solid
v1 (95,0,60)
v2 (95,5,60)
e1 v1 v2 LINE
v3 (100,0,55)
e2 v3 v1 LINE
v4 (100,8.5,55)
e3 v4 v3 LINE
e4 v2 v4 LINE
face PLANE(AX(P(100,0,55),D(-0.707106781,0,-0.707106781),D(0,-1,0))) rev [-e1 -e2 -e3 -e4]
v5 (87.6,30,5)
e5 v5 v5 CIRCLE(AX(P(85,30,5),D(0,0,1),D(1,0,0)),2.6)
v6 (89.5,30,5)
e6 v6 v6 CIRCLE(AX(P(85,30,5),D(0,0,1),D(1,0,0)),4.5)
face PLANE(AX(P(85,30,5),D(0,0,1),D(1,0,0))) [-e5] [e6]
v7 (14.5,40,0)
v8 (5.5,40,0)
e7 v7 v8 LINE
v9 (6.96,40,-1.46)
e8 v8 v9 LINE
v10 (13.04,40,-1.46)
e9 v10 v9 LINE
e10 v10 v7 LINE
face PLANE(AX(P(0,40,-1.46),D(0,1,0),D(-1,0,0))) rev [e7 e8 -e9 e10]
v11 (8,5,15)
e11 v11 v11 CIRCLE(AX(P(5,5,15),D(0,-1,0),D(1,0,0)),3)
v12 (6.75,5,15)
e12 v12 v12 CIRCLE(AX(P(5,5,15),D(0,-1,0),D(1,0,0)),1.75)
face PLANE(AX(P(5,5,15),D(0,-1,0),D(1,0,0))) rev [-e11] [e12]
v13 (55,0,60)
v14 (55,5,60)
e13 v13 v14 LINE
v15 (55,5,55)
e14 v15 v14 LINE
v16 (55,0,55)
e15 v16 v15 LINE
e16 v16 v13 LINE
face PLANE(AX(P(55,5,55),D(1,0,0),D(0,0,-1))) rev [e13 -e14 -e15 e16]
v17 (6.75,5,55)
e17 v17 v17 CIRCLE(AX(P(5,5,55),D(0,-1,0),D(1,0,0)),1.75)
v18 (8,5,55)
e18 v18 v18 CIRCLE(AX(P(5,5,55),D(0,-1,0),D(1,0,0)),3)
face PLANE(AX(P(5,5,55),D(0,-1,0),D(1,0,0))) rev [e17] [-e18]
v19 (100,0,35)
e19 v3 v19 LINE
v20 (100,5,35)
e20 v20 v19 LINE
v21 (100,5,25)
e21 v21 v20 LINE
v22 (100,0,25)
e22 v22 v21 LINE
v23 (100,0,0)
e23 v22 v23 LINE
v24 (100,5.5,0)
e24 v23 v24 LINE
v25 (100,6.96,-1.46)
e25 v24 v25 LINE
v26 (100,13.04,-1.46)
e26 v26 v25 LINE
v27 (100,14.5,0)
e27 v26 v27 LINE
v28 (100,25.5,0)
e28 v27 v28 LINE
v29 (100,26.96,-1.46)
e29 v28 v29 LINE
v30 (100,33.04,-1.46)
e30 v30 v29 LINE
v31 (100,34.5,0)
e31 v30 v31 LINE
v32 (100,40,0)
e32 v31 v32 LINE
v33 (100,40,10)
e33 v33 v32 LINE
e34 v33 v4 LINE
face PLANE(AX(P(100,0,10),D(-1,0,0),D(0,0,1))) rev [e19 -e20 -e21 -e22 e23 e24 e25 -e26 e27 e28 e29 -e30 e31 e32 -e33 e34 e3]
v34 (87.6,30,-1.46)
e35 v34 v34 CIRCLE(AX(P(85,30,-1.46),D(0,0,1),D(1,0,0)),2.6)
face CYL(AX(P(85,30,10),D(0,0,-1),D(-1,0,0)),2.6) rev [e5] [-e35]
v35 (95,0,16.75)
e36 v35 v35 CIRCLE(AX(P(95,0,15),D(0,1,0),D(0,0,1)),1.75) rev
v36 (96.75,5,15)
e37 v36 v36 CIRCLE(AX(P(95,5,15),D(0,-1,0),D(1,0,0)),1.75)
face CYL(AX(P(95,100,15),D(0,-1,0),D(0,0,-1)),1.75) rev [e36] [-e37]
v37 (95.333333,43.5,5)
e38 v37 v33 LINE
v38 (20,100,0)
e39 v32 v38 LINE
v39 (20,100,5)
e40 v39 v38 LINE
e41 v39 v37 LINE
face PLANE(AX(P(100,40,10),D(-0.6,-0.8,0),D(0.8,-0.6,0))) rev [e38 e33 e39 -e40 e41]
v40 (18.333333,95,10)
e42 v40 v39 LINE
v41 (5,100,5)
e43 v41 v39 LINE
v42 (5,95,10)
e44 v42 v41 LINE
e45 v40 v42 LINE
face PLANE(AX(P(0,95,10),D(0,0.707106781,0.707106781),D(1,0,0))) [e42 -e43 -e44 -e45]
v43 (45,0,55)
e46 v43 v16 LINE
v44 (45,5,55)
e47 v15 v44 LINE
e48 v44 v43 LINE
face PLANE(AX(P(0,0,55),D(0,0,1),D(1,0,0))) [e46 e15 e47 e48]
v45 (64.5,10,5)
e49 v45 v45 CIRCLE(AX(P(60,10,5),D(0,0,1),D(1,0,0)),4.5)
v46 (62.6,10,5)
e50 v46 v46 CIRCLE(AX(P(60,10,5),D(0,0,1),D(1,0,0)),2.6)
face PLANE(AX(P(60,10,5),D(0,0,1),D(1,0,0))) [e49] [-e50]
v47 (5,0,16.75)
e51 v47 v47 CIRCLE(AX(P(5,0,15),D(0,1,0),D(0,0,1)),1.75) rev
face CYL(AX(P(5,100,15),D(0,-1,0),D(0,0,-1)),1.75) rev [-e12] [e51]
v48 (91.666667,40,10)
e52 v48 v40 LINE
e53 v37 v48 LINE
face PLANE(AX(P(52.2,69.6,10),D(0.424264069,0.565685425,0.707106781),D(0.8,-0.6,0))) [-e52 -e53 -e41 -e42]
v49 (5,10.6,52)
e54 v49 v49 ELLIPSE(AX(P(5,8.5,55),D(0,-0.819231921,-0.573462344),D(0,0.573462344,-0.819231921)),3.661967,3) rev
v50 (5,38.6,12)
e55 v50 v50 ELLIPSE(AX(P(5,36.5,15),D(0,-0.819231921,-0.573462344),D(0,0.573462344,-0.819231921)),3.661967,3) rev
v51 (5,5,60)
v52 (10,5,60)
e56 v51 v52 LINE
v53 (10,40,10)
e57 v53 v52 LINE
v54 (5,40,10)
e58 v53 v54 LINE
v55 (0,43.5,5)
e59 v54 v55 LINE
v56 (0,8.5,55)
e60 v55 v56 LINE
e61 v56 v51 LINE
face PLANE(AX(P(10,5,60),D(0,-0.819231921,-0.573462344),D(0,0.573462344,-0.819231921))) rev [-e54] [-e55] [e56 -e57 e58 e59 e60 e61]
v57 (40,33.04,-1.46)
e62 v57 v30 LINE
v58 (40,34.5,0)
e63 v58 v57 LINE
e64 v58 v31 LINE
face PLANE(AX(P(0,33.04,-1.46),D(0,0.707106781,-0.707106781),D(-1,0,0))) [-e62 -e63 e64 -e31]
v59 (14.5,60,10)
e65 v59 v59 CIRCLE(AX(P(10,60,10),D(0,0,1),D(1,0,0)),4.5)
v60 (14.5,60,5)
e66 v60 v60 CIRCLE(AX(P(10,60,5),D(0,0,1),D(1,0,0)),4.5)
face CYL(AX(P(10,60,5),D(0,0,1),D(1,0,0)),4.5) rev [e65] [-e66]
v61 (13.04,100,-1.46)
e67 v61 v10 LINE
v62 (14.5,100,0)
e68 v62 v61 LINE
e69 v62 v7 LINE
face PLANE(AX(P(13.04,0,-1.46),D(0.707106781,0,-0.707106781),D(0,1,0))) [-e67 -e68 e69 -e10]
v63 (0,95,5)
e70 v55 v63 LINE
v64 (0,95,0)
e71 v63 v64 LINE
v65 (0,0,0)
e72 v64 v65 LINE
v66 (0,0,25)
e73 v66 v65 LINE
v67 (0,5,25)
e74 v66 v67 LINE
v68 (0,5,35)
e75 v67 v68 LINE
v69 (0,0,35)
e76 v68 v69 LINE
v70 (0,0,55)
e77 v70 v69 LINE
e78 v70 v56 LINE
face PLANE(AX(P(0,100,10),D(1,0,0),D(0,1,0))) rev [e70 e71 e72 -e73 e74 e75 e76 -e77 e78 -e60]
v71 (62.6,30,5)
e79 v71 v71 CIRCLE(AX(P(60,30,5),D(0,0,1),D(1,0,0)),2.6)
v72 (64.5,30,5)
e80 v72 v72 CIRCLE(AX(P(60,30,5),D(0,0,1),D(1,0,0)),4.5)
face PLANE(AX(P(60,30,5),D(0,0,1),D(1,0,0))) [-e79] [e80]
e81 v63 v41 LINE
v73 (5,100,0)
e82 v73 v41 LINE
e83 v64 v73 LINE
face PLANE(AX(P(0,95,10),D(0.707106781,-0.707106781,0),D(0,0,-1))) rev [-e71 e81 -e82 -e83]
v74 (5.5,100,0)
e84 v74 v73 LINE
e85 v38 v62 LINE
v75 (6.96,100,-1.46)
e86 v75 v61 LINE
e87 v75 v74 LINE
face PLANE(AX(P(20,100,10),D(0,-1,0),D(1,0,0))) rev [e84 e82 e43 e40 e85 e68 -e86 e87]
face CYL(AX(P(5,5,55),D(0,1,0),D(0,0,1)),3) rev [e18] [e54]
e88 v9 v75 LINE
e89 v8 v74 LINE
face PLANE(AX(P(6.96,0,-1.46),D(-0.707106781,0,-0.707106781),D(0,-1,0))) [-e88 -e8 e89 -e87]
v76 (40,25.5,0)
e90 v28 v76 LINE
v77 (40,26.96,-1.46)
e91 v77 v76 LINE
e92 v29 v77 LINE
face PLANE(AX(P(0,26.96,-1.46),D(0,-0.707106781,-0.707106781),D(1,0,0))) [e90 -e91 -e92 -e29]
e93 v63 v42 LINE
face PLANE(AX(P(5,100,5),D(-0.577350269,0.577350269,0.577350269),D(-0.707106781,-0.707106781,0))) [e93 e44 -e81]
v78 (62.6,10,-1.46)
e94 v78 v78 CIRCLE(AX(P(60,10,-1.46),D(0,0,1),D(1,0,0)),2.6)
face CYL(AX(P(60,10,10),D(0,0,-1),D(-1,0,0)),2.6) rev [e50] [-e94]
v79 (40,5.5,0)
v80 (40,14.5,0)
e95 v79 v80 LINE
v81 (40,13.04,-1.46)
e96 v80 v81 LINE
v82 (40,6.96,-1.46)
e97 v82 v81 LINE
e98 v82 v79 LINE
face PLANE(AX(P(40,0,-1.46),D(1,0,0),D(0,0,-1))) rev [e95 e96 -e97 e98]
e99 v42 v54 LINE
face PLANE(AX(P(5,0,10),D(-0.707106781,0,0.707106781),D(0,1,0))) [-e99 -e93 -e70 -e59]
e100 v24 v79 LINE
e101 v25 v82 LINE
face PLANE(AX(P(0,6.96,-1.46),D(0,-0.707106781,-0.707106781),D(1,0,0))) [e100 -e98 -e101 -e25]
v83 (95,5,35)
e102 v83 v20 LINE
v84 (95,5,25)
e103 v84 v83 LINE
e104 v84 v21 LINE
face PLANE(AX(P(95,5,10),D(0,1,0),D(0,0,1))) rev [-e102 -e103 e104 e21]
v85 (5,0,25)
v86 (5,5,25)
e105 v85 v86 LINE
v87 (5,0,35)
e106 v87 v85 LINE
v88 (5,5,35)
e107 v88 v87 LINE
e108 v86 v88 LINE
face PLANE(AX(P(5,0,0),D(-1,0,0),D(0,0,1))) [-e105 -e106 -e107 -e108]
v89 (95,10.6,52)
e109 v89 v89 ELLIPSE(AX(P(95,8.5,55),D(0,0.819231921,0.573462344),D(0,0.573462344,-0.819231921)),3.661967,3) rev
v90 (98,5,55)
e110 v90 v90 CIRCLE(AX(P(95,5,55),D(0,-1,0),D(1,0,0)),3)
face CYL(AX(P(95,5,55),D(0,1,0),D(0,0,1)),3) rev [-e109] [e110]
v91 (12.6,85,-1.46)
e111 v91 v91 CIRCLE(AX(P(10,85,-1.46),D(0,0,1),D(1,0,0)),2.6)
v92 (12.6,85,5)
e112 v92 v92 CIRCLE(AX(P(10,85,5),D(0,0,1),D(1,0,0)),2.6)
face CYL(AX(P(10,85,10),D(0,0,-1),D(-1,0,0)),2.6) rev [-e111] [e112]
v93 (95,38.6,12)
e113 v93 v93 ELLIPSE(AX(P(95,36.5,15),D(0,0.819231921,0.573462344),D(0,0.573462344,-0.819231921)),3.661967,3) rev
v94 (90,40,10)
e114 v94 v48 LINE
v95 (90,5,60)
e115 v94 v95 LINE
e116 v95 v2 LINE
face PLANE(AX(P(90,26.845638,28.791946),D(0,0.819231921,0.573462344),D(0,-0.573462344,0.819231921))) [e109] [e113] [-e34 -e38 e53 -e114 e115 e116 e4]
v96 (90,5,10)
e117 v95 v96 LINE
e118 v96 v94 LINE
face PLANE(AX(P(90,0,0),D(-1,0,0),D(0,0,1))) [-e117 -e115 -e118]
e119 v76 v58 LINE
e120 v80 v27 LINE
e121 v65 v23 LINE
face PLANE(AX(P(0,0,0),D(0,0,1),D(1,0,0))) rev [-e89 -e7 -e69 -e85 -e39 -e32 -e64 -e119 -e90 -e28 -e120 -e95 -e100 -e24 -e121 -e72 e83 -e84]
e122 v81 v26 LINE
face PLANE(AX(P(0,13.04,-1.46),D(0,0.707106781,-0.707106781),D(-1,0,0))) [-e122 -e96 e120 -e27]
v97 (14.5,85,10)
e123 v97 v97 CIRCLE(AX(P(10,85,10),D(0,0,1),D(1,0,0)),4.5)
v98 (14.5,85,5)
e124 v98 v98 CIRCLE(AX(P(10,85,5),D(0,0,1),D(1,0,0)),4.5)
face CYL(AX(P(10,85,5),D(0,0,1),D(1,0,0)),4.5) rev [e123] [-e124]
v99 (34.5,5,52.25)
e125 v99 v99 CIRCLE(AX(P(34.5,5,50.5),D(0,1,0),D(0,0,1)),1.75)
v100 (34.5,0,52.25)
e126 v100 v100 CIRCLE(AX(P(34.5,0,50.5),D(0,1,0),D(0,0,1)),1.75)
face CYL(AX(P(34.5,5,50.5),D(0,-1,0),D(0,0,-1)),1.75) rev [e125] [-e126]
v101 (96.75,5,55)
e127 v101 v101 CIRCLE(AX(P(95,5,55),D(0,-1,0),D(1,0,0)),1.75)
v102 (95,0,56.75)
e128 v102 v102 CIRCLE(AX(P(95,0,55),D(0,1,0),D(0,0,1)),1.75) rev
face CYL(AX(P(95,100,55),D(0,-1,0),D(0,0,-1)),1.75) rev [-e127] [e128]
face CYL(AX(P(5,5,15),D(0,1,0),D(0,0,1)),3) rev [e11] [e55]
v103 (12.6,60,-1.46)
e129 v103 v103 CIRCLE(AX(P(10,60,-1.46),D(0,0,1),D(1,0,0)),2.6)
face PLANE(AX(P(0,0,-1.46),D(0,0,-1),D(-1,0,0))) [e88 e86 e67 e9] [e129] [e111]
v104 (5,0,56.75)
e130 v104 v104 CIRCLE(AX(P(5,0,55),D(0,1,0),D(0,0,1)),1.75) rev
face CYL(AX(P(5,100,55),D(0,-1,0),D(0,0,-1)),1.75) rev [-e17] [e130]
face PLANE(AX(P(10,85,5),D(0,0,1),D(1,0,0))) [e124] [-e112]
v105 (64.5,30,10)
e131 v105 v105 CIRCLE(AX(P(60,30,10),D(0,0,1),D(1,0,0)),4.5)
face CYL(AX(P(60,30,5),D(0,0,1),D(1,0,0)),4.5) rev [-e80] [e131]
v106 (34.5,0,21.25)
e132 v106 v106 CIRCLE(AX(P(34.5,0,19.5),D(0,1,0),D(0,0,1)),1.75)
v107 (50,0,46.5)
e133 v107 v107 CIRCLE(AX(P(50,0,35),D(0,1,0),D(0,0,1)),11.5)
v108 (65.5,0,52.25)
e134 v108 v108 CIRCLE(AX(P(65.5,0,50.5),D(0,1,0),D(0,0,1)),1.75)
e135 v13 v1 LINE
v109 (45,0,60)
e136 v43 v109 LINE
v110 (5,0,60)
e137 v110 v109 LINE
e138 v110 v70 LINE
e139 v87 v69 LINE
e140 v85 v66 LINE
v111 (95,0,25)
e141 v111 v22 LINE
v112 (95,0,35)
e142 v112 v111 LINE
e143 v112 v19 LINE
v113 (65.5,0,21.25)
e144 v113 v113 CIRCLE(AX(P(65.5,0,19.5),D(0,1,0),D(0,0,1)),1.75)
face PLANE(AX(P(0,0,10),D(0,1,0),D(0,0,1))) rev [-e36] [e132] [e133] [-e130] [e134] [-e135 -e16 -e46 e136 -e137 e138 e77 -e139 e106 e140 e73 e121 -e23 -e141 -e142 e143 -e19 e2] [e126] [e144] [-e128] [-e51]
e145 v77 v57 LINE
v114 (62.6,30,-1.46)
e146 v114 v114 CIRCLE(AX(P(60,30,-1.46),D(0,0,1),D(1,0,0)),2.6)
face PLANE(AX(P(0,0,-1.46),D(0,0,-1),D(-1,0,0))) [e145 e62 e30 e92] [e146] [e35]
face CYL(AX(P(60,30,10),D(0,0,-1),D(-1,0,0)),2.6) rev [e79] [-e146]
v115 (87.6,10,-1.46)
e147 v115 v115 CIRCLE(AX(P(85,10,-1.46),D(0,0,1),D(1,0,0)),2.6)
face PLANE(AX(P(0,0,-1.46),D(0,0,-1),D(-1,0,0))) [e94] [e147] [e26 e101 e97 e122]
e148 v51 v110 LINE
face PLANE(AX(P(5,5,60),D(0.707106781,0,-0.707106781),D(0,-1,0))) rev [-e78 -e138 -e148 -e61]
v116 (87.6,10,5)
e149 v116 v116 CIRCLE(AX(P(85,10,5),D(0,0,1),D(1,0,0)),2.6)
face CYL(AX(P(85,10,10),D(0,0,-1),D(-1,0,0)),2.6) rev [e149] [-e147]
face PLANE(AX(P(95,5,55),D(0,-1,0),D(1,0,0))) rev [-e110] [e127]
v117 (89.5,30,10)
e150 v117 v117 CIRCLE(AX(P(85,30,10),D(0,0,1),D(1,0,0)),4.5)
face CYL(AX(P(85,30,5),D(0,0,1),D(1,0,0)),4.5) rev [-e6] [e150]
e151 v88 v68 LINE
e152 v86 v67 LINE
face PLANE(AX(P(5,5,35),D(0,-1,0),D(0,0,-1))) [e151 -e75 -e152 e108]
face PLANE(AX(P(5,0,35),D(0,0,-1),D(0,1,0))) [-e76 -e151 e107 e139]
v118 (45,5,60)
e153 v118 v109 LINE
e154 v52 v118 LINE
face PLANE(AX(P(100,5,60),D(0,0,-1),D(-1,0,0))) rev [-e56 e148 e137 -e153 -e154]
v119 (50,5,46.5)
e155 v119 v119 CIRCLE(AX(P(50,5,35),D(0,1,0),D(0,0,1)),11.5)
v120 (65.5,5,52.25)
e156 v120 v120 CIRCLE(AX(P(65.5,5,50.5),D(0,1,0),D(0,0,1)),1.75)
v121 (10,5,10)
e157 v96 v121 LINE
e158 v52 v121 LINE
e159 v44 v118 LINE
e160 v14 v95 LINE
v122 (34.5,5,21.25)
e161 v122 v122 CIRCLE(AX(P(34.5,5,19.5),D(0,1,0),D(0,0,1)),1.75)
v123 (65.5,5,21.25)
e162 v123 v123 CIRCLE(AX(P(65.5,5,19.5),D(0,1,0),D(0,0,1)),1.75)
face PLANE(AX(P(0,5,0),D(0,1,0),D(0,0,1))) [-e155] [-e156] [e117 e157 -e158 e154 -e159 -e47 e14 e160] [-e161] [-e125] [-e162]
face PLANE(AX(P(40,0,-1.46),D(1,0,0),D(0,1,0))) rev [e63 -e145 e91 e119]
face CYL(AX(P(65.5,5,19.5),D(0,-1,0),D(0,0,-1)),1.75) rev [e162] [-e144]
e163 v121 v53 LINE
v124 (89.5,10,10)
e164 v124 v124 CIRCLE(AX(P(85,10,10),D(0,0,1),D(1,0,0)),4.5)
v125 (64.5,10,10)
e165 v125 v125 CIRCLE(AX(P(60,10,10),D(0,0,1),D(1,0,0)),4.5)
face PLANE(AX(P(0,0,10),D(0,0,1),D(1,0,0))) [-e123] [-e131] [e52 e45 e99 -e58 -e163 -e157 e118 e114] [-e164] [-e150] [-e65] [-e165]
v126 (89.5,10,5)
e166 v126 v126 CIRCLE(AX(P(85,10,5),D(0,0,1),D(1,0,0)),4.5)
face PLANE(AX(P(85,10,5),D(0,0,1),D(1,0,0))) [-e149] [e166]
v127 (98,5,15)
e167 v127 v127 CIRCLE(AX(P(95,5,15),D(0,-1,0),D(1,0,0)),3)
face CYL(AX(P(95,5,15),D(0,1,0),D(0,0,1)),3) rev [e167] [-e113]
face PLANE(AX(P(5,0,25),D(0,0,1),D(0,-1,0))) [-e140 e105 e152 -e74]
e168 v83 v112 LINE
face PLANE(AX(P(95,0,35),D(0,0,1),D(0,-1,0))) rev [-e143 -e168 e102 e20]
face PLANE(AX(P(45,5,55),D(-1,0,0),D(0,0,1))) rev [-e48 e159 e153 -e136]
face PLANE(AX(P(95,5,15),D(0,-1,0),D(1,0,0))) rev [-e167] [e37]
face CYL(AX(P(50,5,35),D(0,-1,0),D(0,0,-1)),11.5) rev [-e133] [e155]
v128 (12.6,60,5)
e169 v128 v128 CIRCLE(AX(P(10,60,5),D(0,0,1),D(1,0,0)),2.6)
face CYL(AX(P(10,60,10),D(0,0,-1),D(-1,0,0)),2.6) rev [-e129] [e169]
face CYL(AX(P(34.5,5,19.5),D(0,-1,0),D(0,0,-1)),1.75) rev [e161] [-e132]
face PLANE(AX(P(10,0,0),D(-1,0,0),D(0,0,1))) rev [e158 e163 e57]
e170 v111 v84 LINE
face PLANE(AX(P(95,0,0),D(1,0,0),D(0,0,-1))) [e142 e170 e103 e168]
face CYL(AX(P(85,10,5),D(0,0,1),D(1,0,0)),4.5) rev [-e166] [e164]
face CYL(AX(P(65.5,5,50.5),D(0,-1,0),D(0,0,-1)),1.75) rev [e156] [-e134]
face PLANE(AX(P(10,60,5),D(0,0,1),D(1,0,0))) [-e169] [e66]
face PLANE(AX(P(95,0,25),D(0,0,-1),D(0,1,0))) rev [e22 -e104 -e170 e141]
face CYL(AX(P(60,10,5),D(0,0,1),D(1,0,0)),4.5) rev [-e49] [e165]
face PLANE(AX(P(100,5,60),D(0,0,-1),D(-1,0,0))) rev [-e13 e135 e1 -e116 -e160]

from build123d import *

# Parameters (mm, degrees)
BOSS_EXTRUDE1_DEPTH     = 10
SKETCH2_R               = 2.6
CUT_EXTRUDE1_DEPTH      = 142.774468788
SKETCH3_W               = 60
SKETCH3_H               = 9
SKETCH3_W_2             = 9
SKETCH3_H_2             = 60
BOSS_EXTRUDE3_DEPTH     = 1.46
CUT_EXTRUDE2_DEPTH      = 142.774468788
CUT_EXTRUDE2_DEPTH_BACK = 142.774468788
SKETCH2_2_R             = 2.6
CHAMFER1_SIZE           = 1.46
CUT_EXTRUDE3_START      = 10
SKETCH4_R               = 4.5
CUT_EXTRUDE3_DEPTH      = 5
SKETCH5_W               = 100
SKETCH5_H               = 50
SKETCH5_R               = 11.5
SKETCH5_R_2             = 1.75
BOSS_EXTRUDE4_DEPTH     = 5
BOSS_EXTRUDE5_DEPTH     = 10
BOSS_EXTRUDE6_START     = 100
BOSS_EXTRUDE6_DEPTH     = 10
CUT_EXTRUDE4_DEPTH      = 154.622914957
CUT_EXTRUDE4_DEPTH_BACK = 154.622914957
SKETCH9_R               = 1.75
SKETCH10_W              = 10
SKETCH10_H              = 5
CUT_EXTRUDE5_DEPTH      = 5
CUT_EXTRUDE6_START      = 100
SKETCH10_2_W            = 10
SKETCH10_2_H            = 5
CUT_EXTRUDE6_DEPTH      = 5
CUT_EXTRUDE7_START      = 60
SKETCH11_W              = 10
SKETCH11_H              = 5
CUT_EXTRUDE7_DEPTH      = 5
CUT_EXTRUDE9_START      = 100
SKETCH12_R              = 3
CUT_EXTRUDE9_DEPTH      = 95
CHAMFER2_SIZE           = 5


# Some blends are built 0.0001 mm under size
with BuildPart() as part:
    # Sketch1 → Boss-Extrude1 (new body)
    with BuildSketch(Plane.XY):
        Polygon((0, 0), (100, 0), (100, 40), (20, 100), (0, 100), align=None)
    extrude(amount=BOSS_EXTRUDE1_DEPTH)

    # Sketch2 → Cut-Extrude1 (cut, through all)
    with BuildSketch(Plane.XY):
        with Locations((10, 85)):
            Circle(SKETCH2_R)
        with Locations((10, 60)):
            Circle(SKETCH2_R)
        with Locations((85, 30)):
            Circle(SKETCH2_R)
        with Locations((85, 10)):
            Circle(SKETCH2_R)
        with Locations((60, 10)):
            Circle(SKETCH2_R)
        with Locations((60, 30)):
            Circle(SKETCH2_R)
    extrude(amount=CUT_EXTRUDE1_DEPTH, mode=Mode.SUBTRACT)

    # Sketch3 → Boss-Extrude3 (add)
    with BuildSketch(Plane.XY):
        with Locations((70, 30)):
            Rectangle(SKETCH3_W, SKETCH3_H)
        with Locations((70, 10)):
            Rectangle(SKETCH3_W, SKETCH3_H)
        with Locations((10, 70)):
            Rectangle(SKETCH3_W_2, SKETCH3_H_2)
    extrude(amount=-BOSS_EXTRUDE3_DEPTH)

    # Sketch2<2> → Cut-Extrude2 (cut, two sides: drawn at the far end of the back side and taken through both)
    with BuildSketch(Plane.XY.offset(-CUT_EXTRUDE2_DEPTH_BACK)):
        with Locations((10, 85)):
            Circle(SKETCH2_2_R)
        with Locations((10, 60)):
            Circle(SKETCH2_2_R)
        with Locations((85, 30)):
            Circle(SKETCH2_2_R)
        with Locations((85, 10)):
            Circle(SKETCH2_2_R)
        with Locations((60, 10)):
            Circle(SKETCH2_2_R)
        with Locations((60, 30)):
            Circle(SKETCH2_2_R)
    extrude(amount=CUT_EXTRUDE2_DEPTH + CUT_EXTRUDE2_DEPTH_BACK, mode=Mode.SUBTRACT)

    # Chamfer1
    chamfer1_edges = [part.edges().sort_by_distance(p)[0] for p in [
        (14.5, 70, -1.46),
        (5.5, 70, -1.46),
        (70, 5.5, -1.46),
        (70, 14.5, -1.46),
        (70, 25.5, -1.46),
        (70, 34.5, -1.46),
    ]]
    chamfer(chamfer1_edges, length=CHAMFER1_SIZE - 0.0001)  # a hair under: the kernel refuses the full size

    # Sketch4 → Cut-Extrude3 (cut)
    with BuildSketch(Plane.XY.offset(CUT_EXTRUDE3_START)):
        with Locations((10, 85)):
            Circle(SKETCH4_R)
        with Locations((10, 60)):
            Circle(SKETCH4_R)
        with Locations((60, 30)):
            Circle(SKETCH4_R)
        with Locations((85, 30)):
            Circle(SKETCH4_R)
        with Locations((85, 10)):
            Circle(SKETCH4_R)
        with Locations((60, 10)):
            Circle(SKETCH4_R)
    extrude(amount=-CUT_EXTRUDE3_DEPTH, mode=Mode.SUBTRACT)

    # Sketch5 → Boss-Extrude4 (add)
    with BuildSketch(Plane(origin=(0, 0, 0), x_dir=(1, 0, 0), z_dir=(0, 1, 0))):
        with Locations((50, -35)):
            Rectangle(SKETCH5_W, SKETCH5_H)
        with Locations(Location((50, -35, 0), (0, 0, 270))):
            Circle(SKETCH5_R, mode=Mode.SUBTRACT)
        with Locations(Location((65.5, -50.5, 0), (0, 0, 270))):
            Circle(SKETCH5_R_2, mode=Mode.SUBTRACT)
        with Locations(Location((34.5, -50.5, 0), (0, 0, 270))):
            Circle(SKETCH5_R_2, mode=Mode.SUBTRACT)
        with Locations(Location((34.5, -19.5, 0), (0, 0, 270))):
            Circle(SKETCH5_R_2, mode=Mode.SUBTRACT)
        with Locations(Location((65.5, -19.5, 0), (0, 0, 270))):
            Circle(SKETCH5_R_2, mode=Mode.SUBTRACT)
    extrude(amount=BOSS_EXTRUDE4_DEPTH)

    # Sketch8 → Boss-Extrude5 (add)
    with BuildSketch(Plane(origin=(0, 0, 0), x_dir=(0, 0, -1), z_dir=(1, 0, 0))):
        Polygon((-10, 5), (-60, 5), (-10, 40), align=None)
    extrude(amount=BOSS_EXTRUDE5_DEPTH)

    # Sketch8<2> → Boss-Extrude6 (add)
    with BuildSketch(Plane(origin=(0, 0, 0), x_dir=(0, 0, -1), z_dir=(1, 0, 0)).offset(BOSS_EXTRUDE6_START)):
        Polygon((-10, 5), (-60, 5), (-10, 40), align=None)
    extrude(amount=-BOSS_EXTRUDE6_DEPTH)

    # Sketch9 → Cut-Extrude4 (cut, two sides: drawn at the far end of the back side and taken through both)
    with BuildSketch(Plane(origin=(0, 0, 0), x_dir=(1, 0, 0), z_dir=(0, 1, 0)).offset(-CUT_EXTRUDE4_DEPTH_BACK)):
        with Locations(Location((5, -55, 0), (0, 0, 270))):
            Circle(SKETCH9_R)
        with Locations(Location((95, -55, 0), (0, 0, 270))):
            Circle(SKETCH9_R)
        with Locations(Location((95, -15, 0), (0, 0, 270))):
            Circle(SKETCH9_R)
        with Locations(Location((5, -15, 0), (0, 0, 270))):
            Circle(SKETCH9_R)
    extrude(amount=CUT_EXTRUDE4_DEPTH + CUT_EXTRUDE4_DEPTH_BACK, mode=Mode.SUBTRACT)

    # Sketch10 → Cut-Extrude5 (cut)
    with BuildSketch(Plane(origin=(0, 0, 0), x_dir=(0, 0, -1), z_dir=(1, 0, 0))):
        with Locations((-30, 2.5)):
            Rectangle(SKETCH10_W, SKETCH10_H)
    extrude(amount=CUT_EXTRUDE5_DEPTH, mode=Mode.SUBTRACT)

    # Sketch10<2> → Cut-Extrude6 (cut)
    with BuildSketch(Plane(origin=(0, 0, 0), x_dir=(0, 0, -1), z_dir=(1, 0, 0)).offset(CUT_EXTRUDE6_START)):
        with Locations((-30, 2.5)):
            Rectangle(SKETCH10_2_W, SKETCH10_2_H)
    extrude(amount=-CUT_EXTRUDE6_DEPTH, mode=Mode.SUBTRACT)

    # Sketch11 → Cut-Extrude7 (cut)
    with BuildSketch(Plane.XY.offset(CUT_EXTRUDE7_START)):
        with Locations((50, 2.5)):
            Rectangle(SKETCH11_W, SKETCH11_H)
    extrude(amount=-CUT_EXTRUDE7_DEPTH, mode=Mode.SUBTRACT)

    # Sketch12 → Cut-Extrude9 (cut)
    with BuildSketch(Plane(origin=(0, 0, 0), x_dir=(1, 0, 0), z_dir=(0, 1, 0)).offset(CUT_EXTRUDE9_START)):
        with Locations((5, -15)):
            Circle(SKETCH12_R)
        with Locations((5, -55)):
            Circle(SKETCH12_R)
        with Locations((95, -55)):
            Circle(SKETCH12_R)
        with Locations((95, -15)):
            Circle(SKETCH12_R)
    extrude(amount=-CUT_EXTRUDE9_DEPTH, mode=Mode.SUBTRACT)

    # Chamfer2
    # the kernel refuses this chamfer: 5 mm, written as the material it takes off along each edge
    with BuildSketch(Plane(origin=(3.333333333, 96.666666667, 6.666666667), x_dir=(-0.7071067811865474, 0, -0.7071067811865476), z_dir=(-0.5773502691896258, 0.5773502691896257, 0.5773502691896257))) as chamfer2_piece_1:
        Polygon((-3.535533906, 2.041241452), (3.535533906, 2.041241452), (0, -4.082482905), align=None)
    extrude(amount=6.350852961, mode=Mode.SUBTRACT)
    with BuildSketch(Plane(origin=(110.286731952, 32.284951036, 10), x_dir=(0.016497525966350957, 0.021996701288467948, -0.9996219169112968), z_dir=(-0.8000000000000002, 0.6, 0))) as chamfer2_piece_2_section:
        Polygon((CHAMFER2_SIZE * 0.999621916911, CHAMFER2_SIZE * 0.0274958766106), (-CHAMFER2_SIZE * 0.0274958766106, CHAMFER2_SIZE * 0.999621916911), (0, 0), align=None)
    chamfer2_piece_2 = extrude(amount=125.71682988, mode=Mode.PRIVATE)
    chamfer2_piece_2 = split(chamfer2_piece_2, bisect_by=Plane(origin=(56.438385269, 50.830938552, -5.472769359), z_dir=(0, 0.8192319205190406, 0.5734623443633283)), keep=Keep.TOP, mode=Mode.PRIVATE)
    add(chamfer2_piece_2, mode=Mode.SUBTRACT)
    with BuildSketch(Plane(origin=(100, -12.85841494, 60), x_dir=(0.0274958766105877, 0, -0.9996219169112968), z_dir=(0, 1, 0))) as chamfer2_piece_3:
        Polygon((CHAMFER2_SIZE * 0.999621916911, CHAMFER2_SIZE * 0.0274958766106), (-CHAMFER2_SIZE * 0.0274958766106, CHAMFER2_SIZE * 0.999621916911), (0, 0), align=None)
    extrude(amount=30.71682988, mode=Mode.SUBTRACT)
    with BuildSketch(Plane(origin=(0, -12.85841494, 60), x_dir=(-0.027495876610586372, 0, -0.9996219169112968), z_dir=(0, 1, 0))) as chamfer2_piece_4:
        Polygon((CHAMFER2_SIZE * 0.999621916911, -CHAMFER2_SIZE * 0.0274958766106), (-CHAMFER2_SIZE * 0.0274958766106, -CHAMFER2_SIZE * 0.999621916911), (0, 0), align=None)
    extrude(amount=30.71682988, mode=Mode.SUBTRACT)
    with BuildSketch(Plane(origin=(32.85841494, 100, 10), x_dir=(0, 0.0274958766105877, -0.9996219169112968), z_dir=(-1, 0, 0))) as chamfer2_piece_5:
        Polygon((CHAMFER2_SIZE * 0.999621916911, CHAMFER2_SIZE * 0.0274958766106), (-CHAMFER2_SIZE * 0.0274958766106, CHAMFER2_SIZE * 0.999621916911), (0, 0), align=None)
    extrude(amount=45.71682988, mode=Mode.SUBTRACT)
    with BuildSketch(Plane(origin=(0, 112.85841494, 10), x_dir=(-0.02749587661058638, 0, -0.9996219169112968), z_dir=(0, -1, 0))) as chamfer2_piece_6_section:
        Polygon((CHAMFER2_SIZE * 0.999621916911, CHAMFER2_SIZE * 0.0274958766106), (-CHAMFER2_SIZE * 0.0274958766106, CHAMFER2_SIZE * 0.999621916911), (0, 0), align=None)
    chamfer2_piece_6 = extrude(amount=85.71682988, mode=Mode.PRIVATE)
    chamfer2_piece_6 = split(chamfer2_piece_6, bisect_by=Plane(origin=(1.674929178, 50.830938552, -5.472769359), z_dir=(0, 0.8192319205190406, 0.5734623443633283)), keep=Keep.TOP, mode=Mode.PRIVATE)
    add(chamfer2_piece_6, mode=Mode.SUBTRACT)
    with BuildSketch(Plane(origin=(0, 100, -12.85841494), x_dir=(-0.027495876610586313, -0.9996219169112968, 0), z_dir=(0, 0, 1))) as chamfer2_piece_7:
        Polygon((CHAMFER2_SIZE * 0.999621916911, CHAMFER2_SIZE * 0.0274958766106), (-CHAMFER2_SIZE * 0.0274958766106, CHAMFER2_SIZE * 0.999621916911), (0, 0), align=None)
    extrude(amount=35.71682988, mode=Mode.SUBTRACT)


solid = part.part
